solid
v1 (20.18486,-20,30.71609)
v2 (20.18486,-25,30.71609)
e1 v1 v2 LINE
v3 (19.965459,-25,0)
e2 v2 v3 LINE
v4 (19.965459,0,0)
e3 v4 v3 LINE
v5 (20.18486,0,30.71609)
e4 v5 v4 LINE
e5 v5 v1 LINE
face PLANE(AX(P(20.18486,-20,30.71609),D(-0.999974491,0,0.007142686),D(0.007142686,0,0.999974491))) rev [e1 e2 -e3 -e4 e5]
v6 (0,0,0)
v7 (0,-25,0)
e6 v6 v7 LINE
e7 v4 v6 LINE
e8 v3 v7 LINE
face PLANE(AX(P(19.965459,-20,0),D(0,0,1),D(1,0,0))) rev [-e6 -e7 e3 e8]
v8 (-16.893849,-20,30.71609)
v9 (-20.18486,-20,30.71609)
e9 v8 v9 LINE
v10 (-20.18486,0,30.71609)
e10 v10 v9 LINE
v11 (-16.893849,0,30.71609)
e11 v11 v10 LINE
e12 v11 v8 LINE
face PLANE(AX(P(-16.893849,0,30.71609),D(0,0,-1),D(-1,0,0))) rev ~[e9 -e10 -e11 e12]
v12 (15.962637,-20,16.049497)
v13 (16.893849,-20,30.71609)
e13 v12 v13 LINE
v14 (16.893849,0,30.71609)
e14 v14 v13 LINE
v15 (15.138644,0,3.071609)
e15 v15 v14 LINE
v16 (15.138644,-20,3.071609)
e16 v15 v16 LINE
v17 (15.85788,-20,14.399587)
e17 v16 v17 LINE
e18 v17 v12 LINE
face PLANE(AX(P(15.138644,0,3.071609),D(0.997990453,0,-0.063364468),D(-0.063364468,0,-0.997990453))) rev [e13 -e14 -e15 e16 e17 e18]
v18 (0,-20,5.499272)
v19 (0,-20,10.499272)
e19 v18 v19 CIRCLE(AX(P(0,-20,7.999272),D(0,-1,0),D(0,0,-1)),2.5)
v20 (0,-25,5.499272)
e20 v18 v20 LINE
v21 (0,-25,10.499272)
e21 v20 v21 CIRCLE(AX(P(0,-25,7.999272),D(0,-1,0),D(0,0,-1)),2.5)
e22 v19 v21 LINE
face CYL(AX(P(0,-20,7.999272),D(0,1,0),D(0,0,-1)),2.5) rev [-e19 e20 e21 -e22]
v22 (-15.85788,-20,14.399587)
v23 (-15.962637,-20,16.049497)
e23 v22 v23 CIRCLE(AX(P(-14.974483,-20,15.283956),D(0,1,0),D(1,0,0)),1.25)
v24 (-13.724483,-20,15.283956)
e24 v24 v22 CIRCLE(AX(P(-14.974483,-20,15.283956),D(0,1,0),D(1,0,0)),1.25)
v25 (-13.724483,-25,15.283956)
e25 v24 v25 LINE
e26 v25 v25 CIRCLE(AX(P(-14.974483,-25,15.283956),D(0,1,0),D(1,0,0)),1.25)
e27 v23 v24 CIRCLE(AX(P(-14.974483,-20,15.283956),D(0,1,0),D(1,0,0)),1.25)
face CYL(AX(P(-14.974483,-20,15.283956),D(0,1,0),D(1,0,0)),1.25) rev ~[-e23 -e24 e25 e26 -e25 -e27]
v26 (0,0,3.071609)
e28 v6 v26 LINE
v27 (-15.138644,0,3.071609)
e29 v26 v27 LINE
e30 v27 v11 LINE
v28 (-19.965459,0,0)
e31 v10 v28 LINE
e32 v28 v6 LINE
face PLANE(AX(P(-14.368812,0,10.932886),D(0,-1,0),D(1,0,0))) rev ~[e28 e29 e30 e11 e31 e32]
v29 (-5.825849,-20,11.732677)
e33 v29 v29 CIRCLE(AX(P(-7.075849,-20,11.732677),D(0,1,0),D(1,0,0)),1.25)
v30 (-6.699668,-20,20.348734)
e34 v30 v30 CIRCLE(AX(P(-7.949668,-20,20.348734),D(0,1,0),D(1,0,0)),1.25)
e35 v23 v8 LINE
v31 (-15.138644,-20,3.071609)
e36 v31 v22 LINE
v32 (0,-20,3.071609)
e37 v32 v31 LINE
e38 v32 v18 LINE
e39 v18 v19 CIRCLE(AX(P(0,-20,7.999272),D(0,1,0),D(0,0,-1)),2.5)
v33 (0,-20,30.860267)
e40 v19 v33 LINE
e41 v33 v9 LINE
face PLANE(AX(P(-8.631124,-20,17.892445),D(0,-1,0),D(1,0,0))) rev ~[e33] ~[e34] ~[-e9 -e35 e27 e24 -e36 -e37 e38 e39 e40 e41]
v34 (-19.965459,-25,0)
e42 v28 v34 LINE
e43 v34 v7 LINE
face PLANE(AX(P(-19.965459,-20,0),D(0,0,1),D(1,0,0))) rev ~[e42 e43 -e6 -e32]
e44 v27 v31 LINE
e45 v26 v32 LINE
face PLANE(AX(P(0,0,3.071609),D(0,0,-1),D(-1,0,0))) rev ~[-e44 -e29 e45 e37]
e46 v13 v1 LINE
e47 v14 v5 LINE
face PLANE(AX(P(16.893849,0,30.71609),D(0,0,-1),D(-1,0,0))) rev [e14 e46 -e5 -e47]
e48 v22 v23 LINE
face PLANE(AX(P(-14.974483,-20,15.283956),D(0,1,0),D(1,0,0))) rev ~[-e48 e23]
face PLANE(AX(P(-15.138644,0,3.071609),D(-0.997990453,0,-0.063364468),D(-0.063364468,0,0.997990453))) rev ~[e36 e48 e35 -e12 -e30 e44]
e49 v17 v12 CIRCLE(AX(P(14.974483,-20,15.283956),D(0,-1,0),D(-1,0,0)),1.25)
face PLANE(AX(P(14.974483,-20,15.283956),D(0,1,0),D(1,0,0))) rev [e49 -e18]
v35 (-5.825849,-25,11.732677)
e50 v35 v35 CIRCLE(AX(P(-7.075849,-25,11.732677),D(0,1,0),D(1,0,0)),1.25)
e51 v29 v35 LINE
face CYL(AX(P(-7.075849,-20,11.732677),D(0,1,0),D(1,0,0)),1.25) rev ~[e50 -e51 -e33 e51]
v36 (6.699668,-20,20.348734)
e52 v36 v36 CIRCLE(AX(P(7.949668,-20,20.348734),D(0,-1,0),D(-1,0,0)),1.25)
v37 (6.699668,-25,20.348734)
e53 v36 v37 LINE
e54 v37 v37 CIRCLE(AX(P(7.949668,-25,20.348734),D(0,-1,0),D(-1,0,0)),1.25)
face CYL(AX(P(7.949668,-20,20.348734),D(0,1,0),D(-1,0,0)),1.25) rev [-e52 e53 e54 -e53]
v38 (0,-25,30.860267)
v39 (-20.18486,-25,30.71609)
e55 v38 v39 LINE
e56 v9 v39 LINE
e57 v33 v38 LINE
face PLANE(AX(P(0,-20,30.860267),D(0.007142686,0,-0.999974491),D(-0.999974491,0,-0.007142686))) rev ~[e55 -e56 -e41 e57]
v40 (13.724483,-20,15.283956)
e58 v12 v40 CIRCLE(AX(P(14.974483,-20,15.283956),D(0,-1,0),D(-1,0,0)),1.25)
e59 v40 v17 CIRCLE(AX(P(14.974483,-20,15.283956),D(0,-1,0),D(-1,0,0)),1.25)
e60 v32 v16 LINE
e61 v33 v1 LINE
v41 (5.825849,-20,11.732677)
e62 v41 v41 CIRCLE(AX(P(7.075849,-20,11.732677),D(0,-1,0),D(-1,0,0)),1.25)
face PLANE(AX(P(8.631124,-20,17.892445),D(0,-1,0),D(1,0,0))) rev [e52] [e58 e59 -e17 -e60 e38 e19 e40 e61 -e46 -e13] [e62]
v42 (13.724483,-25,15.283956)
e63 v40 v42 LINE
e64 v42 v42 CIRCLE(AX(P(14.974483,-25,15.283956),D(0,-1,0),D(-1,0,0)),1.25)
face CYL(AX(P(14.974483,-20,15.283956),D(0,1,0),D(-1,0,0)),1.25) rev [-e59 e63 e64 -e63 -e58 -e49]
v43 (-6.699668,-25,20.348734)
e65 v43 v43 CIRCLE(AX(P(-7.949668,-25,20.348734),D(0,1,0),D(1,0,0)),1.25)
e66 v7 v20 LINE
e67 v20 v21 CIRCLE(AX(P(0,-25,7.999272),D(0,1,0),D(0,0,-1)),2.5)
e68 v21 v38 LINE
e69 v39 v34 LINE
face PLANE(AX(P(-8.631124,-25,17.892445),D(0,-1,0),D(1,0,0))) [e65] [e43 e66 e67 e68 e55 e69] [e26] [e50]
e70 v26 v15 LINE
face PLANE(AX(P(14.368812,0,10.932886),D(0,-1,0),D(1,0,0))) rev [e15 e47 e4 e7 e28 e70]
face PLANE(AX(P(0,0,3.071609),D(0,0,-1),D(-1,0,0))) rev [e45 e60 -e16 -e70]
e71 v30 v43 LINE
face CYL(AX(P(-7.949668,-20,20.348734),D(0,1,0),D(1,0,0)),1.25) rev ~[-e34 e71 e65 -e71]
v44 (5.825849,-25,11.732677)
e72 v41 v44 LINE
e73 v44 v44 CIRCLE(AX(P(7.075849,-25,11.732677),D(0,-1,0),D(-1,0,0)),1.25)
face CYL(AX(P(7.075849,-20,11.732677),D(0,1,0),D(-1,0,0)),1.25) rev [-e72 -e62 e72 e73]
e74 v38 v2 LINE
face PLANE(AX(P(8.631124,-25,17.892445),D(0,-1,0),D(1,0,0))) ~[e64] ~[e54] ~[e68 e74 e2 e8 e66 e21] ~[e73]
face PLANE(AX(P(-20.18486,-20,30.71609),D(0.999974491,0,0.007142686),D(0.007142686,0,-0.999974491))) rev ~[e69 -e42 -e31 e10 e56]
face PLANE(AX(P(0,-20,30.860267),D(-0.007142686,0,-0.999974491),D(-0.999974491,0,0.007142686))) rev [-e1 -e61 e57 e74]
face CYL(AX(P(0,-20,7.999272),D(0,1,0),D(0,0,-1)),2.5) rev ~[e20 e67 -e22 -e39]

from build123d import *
from build123d import SkipClean  # not in build123d's __all__

# Parameters (mm, degrees)
F1_DEPTH = 20
F3_DEPTH = 5
F4_D     = 2.5
F4_DEPTH = 5.001


with BuildPart() as f1:
    # F0 (on Front) → F1 (new body)
    with BuildSketch(Plane.XZ):
        Polygon((-19.9654586613, 0), (0, 0), (0, 3.0716089532), (-15.1386437938, 3.0716089532), (-16.8938487768, 30.7160895318), (-20.1848596334, 30.7160895318), align=None)
    extrude(amount=F1_DEPTH)

    # F2 (on face) → F3 (join)
    with BuildSketch(Plane.XZ.offset(20)):
        with BuildLine():
            Line((0, 30.8602673192), (-20.1848596334, 30.7160895318))
            Line((-20.1848596334, 30.7160895318), (-16.8938487768, 30.7160895318))
            Line((-16.8938487768, 30.7160895318), (-15.1386437938, 3.0716089532))
            Line((-15.1386437938, 3.0716089532), (0, 3.0716089532))
            Line((0, 3.0716089532), (0, 5.4992720857))
            ThreePointArc((0, 5.4992720857), (-2.5, 7.9992720857), (0, 10.4992720857))
            Line((0, 10.4992720857), (0, 30.8602673192))
        make_face()
        Polygon((-16.8938487768, 30.7160895318), (-20.1848596334, 30.7160895318), (-19.9654586613, 0), (0, 0), (0, 3.0716089532), (-15.1386437938, 3.0716089532), align=None)
    extrude(amount=F3_DEPTH)

    # F4 (through all, one way)
    with BuildSketch(Plane(origin=(0, -20, 0), x_dir=(1, 0, 0), z_dir=(0, 1, 0))):
        with Locations((-14.9744828703, -15.2839560666), (-7.0758488149, -11.7326774155), (-7.9496683148, -20.3487344883)):
            Circle(F4_D / 2)
    extrude(amount=-F4_DEPTH, mode=Mode.SUBTRACT)

    # F5: F1 across plane


with BuildPart() as f1_1:
    add(f1.part, clean=False)
    with SkipClean():  # cleaning this boolean's faces spoils the solid; the shape is the same uncleaned
        add(f1.part.mirror(Plane.YZ), clean=False)


solid = f1_1.part
